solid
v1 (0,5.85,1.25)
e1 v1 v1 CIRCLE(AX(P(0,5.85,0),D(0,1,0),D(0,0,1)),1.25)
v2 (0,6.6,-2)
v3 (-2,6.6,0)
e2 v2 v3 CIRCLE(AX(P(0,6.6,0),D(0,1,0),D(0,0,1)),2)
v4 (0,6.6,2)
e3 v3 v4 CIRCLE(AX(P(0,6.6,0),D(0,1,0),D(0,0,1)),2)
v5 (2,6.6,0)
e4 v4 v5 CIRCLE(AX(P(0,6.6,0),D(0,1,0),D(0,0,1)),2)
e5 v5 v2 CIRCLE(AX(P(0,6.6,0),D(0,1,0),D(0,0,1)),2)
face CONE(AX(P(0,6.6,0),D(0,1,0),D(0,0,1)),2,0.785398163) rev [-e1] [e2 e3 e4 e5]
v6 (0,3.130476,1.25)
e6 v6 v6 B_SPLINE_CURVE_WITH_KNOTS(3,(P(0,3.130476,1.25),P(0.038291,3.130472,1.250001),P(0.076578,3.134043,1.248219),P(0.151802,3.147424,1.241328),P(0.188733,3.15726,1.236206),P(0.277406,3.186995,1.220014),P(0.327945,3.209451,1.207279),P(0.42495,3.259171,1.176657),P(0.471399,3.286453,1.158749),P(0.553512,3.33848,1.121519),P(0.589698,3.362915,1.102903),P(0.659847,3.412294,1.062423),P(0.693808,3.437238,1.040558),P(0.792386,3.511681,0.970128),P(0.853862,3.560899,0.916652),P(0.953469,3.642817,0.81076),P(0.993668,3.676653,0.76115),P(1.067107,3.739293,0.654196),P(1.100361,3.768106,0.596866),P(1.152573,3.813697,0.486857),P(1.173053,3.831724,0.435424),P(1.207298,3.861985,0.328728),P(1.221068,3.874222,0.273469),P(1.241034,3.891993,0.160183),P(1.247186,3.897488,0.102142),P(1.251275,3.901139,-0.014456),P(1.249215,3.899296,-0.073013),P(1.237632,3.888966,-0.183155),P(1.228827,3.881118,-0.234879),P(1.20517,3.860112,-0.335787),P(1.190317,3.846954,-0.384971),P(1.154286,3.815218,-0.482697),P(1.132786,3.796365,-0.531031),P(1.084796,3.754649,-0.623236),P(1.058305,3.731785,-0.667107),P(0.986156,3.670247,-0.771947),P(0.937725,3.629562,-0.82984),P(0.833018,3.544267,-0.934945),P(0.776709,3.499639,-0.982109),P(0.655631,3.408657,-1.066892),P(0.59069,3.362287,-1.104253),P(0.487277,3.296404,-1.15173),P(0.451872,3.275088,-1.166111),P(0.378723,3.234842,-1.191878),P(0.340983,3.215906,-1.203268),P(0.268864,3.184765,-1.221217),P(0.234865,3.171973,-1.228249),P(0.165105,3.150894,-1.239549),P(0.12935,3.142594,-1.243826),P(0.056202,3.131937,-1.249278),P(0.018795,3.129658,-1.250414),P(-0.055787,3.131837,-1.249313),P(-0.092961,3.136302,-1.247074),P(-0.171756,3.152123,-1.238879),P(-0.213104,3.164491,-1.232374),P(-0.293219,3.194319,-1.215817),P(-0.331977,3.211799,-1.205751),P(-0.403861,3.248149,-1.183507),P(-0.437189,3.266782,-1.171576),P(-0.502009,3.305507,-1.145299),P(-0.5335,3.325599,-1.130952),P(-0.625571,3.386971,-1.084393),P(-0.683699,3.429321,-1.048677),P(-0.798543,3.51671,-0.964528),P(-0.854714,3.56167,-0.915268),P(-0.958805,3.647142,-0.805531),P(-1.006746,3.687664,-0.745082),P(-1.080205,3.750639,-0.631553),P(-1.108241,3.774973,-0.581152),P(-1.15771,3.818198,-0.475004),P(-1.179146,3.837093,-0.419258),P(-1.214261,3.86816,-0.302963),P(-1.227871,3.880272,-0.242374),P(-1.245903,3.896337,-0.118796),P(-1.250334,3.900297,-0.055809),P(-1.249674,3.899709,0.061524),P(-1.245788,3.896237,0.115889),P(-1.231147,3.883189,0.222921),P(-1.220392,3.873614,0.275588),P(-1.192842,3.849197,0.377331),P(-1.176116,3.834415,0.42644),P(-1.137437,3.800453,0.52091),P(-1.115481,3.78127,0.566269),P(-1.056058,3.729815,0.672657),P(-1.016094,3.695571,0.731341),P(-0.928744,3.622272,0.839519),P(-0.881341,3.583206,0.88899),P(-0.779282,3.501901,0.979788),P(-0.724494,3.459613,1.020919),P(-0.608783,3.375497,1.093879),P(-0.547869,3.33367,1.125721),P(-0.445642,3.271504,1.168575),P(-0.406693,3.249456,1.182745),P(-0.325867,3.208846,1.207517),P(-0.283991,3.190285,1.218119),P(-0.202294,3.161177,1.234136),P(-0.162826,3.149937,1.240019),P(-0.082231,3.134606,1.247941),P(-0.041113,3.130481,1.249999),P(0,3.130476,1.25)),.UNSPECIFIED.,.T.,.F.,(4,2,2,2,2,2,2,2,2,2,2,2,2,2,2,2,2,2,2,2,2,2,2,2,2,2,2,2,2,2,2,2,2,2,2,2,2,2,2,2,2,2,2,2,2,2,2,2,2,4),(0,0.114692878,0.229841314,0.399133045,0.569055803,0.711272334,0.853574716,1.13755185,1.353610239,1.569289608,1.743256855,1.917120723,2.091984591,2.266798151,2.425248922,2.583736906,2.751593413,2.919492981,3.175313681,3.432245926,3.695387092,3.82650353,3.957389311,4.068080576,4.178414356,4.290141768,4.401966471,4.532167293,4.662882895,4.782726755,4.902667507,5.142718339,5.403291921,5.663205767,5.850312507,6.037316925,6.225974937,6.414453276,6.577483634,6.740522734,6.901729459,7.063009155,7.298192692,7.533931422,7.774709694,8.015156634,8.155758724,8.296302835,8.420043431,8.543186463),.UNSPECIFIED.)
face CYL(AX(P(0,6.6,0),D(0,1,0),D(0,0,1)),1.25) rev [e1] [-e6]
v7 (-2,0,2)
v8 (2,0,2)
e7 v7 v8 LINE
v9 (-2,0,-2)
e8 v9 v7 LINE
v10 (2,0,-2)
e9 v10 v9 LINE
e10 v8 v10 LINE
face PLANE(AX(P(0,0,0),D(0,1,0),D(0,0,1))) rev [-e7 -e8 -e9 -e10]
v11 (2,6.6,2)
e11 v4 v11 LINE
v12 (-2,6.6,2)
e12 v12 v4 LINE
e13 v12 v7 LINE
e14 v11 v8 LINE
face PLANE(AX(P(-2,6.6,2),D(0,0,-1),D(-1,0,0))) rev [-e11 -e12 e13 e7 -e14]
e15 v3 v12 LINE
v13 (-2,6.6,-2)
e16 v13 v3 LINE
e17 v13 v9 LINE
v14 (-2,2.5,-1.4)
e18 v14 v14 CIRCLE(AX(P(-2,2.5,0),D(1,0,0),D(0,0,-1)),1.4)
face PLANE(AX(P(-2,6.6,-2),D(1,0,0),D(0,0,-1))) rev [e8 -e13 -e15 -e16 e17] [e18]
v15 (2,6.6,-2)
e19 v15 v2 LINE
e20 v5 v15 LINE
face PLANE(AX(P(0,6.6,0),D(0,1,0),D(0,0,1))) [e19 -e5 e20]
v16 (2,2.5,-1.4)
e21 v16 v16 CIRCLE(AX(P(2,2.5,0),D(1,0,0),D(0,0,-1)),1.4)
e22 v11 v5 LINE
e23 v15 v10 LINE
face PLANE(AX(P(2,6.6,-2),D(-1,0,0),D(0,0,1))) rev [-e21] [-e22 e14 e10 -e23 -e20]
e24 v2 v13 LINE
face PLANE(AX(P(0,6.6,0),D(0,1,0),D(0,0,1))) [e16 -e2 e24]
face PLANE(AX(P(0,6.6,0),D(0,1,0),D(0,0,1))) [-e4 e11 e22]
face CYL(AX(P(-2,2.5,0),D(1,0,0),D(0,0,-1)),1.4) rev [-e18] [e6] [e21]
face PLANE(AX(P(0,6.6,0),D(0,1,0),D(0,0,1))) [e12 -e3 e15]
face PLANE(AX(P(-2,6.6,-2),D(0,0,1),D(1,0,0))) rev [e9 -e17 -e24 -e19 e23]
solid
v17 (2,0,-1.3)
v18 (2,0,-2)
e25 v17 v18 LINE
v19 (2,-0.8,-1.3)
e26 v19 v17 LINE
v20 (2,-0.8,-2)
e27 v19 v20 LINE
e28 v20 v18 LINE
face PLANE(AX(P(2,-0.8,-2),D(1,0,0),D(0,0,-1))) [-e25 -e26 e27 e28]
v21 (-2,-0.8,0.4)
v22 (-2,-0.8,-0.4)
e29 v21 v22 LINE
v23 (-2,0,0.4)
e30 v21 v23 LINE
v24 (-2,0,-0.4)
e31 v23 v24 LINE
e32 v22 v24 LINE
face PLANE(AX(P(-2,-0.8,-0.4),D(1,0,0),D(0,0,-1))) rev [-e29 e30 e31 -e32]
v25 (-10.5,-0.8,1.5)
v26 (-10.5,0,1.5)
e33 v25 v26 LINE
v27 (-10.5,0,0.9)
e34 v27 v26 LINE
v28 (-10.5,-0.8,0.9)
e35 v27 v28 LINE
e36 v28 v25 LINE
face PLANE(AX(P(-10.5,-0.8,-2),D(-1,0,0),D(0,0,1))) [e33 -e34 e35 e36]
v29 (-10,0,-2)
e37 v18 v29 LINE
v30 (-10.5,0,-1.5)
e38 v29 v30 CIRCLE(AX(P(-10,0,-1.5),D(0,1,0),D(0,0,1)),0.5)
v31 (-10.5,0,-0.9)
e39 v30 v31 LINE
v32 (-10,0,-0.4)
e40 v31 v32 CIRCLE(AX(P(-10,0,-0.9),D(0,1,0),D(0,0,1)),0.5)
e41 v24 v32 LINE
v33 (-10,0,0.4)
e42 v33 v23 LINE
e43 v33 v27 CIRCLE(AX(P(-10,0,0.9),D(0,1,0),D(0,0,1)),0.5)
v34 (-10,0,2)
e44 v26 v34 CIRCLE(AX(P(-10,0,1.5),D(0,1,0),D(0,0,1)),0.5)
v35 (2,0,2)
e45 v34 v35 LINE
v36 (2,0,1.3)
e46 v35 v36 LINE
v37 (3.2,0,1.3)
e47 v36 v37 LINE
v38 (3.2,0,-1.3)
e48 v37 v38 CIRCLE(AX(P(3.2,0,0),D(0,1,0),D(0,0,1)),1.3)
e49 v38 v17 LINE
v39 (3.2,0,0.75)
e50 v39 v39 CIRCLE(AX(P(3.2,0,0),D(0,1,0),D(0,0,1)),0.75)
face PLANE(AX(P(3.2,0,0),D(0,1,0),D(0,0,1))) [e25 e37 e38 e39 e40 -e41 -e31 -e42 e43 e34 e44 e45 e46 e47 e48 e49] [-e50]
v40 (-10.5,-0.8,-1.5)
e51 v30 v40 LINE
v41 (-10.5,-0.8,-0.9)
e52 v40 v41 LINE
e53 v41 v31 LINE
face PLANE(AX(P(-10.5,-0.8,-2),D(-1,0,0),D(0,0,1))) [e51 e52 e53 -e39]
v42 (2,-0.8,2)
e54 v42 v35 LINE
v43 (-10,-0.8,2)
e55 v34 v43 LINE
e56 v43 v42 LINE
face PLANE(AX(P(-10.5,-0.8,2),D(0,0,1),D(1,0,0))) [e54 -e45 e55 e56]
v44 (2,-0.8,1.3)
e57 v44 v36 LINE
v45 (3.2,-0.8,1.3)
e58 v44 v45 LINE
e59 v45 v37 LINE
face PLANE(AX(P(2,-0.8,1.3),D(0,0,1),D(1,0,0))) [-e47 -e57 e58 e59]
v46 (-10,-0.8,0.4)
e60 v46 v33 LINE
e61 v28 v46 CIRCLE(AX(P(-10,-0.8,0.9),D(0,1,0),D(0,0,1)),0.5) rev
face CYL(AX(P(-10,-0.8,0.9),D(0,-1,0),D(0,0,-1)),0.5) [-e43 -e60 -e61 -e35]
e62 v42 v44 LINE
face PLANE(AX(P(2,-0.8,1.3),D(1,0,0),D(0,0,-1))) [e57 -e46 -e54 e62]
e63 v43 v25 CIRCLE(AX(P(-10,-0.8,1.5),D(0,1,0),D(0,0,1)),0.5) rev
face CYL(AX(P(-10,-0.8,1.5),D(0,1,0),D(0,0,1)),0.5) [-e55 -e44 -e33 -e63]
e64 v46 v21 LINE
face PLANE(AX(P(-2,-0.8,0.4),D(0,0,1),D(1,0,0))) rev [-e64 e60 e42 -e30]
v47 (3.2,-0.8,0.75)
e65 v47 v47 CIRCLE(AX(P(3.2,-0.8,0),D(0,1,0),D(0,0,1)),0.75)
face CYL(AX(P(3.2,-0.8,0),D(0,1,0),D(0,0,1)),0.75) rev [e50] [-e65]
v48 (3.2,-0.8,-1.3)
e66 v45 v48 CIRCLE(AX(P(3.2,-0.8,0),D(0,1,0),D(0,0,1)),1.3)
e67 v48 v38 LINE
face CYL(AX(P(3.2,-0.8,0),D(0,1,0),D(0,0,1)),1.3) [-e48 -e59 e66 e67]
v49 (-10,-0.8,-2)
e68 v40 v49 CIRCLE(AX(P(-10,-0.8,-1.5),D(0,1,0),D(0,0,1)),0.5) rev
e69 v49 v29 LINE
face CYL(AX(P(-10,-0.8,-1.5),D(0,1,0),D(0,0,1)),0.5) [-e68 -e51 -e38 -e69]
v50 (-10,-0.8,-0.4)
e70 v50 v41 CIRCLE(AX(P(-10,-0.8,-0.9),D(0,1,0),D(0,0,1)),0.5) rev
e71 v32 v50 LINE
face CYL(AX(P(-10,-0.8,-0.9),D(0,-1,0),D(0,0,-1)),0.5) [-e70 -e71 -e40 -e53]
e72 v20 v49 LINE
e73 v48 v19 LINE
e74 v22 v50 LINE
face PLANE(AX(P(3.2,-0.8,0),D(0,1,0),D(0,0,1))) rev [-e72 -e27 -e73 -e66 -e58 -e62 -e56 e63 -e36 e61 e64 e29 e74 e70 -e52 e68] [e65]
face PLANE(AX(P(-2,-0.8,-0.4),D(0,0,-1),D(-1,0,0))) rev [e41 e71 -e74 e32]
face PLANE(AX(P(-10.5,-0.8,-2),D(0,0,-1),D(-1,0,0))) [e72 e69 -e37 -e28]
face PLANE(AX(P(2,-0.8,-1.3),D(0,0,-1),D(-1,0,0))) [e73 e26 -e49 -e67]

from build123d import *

# Parameters (mm, degrees)
TERMINALBODYS_W             = 4
TERMINALBODYS_H             = 4
TERMINAL_BODY_DEPTH         = 6.6
WIRE_ACCESS_DEPTH           = 8.180529228
WIRE_ACCESS_DEPTH_BACK      = 8.180529228
WIREACCESSS_R               = 1.4
SOLDERCONNECTIONS_R         = 0.75
SOLDER_CONNECTION_DEPTH     = 0.8
SOLDERCONNECTIONCUTS_W      = 8.5
SOLDERCONNECTIONCUTS_H      = 0.8
SOLDER_CONNECTION_CUT_DEPTH = 13.562245022
SCF_R                       = 0.5


# Read off the part's stored shape, not the designer's step: M3x0.5 Tapped Hole1
with BuildPart() as part:
    # TerminalBodyS → TERMINAL BODY (new body)
    with BuildSketch(Plane(origin=(0, 0, 0), x_dir=(1, 0, 0), z_dir=(0, 1, 0))):
        Rectangle(TERMINALBODYS_W, TERMINALBODYS_H)
    extrude(amount=TERMINAL_BODY_DEPTH)

    # WireAccessS → WIRE ACCESS (cut, two sides: drawn at the far end of the back side and taken through both)
    with BuildSketch(Plane(origin=(0, 0, 0), x_dir=(0, 0, -1), z_dir=(1, 0, 0)).offset(-WIRE_ACCESS_DEPTH_BACK)):
        with Locations((0, 2.5)):
            Circle(WIREACCESSS_R)
    extrude(amount=WIRE_ACCESS_DEPTH + WIRE_ACCESS_DEPTH_BACK, mode=Mode.SUBTRACT)

    # M3x0.5 Tapped Hole1 outline → M3x0.5 Tapped Hole1 (revolve, cut)
    with BuildSketch(Plane.XY):
        Polygon((0, 3.129982186), (1.25, 3.129982186), (1.25, 5.85), (2, 6.6), (0, 6.6), align=None)
    revolve(axis=Axis((0, 0, 0), (0, 1, 0)), mode=Mode.SUBTRACT)


with BuildPart() as body_2:
    # SolderConnectionS → SOLDER CONNECTION (new body)
    with BuildSketch(Plane(origin=(0, 0, 0), x_dir=(1, 0, 0), z_dir=(0, 1, 0))):
        with BuildLine():
            Line((2, 1.3), (3.2, 1.3))
            ThreePointArc((3.2, 1.3), (4.5, 0), (3.2, -1.3))
            Line((3.2, -1.3), (2, -1.3))
            Line((2, -1.3), (2, -2))
            Line((2, -2), (-10.5, -2))
            Line((-10.5, -2), (-10.5, 2))
            Line((-10.5, 2), (2, 2))
            Line((2, 2), (2, 1.3))
        make_face()
        with Locations(Location((3.2, 0, 0), (0, 0, 270))):
            Circle(SOLDERCONNECTIONS_R, mode=Mode.SUBTRACT)
    extrude(amount=-SOLDER_CONNECTION_DEPTH)

    # SolderConnectionCutS → SOLDER CONNECTION CUT (cut, through all)
    with BuildSketch(Plane(origin=(0, 0, 0), x_dir=(-1, 0, 0), z_dir=(0, 1, 0))):
        with Locations((6.25, 0)):
            Rectangle(SOLDERCONNECTIONCUTS_W, SOLDERCONNECTIONCUTS_H)
    extrude(amount=-SOLDER_CONNECTION_CUT_DEPTH, mode=Mode.SUBTRACT)

    # SCF
    scf_edges = [body_2.edges().sort_by_distance(p)[0] for p in [
        (-10.5, -0.4, 2),
        (-10.5, -0.4, -2),
        (-10.5, -0.4, 0.4),
        (-10.5, -0.4, -0.4),
    ]]
    fillet(scf_edges, radius=SCF_R)


solid = Compound([part.part, body_2.part])
